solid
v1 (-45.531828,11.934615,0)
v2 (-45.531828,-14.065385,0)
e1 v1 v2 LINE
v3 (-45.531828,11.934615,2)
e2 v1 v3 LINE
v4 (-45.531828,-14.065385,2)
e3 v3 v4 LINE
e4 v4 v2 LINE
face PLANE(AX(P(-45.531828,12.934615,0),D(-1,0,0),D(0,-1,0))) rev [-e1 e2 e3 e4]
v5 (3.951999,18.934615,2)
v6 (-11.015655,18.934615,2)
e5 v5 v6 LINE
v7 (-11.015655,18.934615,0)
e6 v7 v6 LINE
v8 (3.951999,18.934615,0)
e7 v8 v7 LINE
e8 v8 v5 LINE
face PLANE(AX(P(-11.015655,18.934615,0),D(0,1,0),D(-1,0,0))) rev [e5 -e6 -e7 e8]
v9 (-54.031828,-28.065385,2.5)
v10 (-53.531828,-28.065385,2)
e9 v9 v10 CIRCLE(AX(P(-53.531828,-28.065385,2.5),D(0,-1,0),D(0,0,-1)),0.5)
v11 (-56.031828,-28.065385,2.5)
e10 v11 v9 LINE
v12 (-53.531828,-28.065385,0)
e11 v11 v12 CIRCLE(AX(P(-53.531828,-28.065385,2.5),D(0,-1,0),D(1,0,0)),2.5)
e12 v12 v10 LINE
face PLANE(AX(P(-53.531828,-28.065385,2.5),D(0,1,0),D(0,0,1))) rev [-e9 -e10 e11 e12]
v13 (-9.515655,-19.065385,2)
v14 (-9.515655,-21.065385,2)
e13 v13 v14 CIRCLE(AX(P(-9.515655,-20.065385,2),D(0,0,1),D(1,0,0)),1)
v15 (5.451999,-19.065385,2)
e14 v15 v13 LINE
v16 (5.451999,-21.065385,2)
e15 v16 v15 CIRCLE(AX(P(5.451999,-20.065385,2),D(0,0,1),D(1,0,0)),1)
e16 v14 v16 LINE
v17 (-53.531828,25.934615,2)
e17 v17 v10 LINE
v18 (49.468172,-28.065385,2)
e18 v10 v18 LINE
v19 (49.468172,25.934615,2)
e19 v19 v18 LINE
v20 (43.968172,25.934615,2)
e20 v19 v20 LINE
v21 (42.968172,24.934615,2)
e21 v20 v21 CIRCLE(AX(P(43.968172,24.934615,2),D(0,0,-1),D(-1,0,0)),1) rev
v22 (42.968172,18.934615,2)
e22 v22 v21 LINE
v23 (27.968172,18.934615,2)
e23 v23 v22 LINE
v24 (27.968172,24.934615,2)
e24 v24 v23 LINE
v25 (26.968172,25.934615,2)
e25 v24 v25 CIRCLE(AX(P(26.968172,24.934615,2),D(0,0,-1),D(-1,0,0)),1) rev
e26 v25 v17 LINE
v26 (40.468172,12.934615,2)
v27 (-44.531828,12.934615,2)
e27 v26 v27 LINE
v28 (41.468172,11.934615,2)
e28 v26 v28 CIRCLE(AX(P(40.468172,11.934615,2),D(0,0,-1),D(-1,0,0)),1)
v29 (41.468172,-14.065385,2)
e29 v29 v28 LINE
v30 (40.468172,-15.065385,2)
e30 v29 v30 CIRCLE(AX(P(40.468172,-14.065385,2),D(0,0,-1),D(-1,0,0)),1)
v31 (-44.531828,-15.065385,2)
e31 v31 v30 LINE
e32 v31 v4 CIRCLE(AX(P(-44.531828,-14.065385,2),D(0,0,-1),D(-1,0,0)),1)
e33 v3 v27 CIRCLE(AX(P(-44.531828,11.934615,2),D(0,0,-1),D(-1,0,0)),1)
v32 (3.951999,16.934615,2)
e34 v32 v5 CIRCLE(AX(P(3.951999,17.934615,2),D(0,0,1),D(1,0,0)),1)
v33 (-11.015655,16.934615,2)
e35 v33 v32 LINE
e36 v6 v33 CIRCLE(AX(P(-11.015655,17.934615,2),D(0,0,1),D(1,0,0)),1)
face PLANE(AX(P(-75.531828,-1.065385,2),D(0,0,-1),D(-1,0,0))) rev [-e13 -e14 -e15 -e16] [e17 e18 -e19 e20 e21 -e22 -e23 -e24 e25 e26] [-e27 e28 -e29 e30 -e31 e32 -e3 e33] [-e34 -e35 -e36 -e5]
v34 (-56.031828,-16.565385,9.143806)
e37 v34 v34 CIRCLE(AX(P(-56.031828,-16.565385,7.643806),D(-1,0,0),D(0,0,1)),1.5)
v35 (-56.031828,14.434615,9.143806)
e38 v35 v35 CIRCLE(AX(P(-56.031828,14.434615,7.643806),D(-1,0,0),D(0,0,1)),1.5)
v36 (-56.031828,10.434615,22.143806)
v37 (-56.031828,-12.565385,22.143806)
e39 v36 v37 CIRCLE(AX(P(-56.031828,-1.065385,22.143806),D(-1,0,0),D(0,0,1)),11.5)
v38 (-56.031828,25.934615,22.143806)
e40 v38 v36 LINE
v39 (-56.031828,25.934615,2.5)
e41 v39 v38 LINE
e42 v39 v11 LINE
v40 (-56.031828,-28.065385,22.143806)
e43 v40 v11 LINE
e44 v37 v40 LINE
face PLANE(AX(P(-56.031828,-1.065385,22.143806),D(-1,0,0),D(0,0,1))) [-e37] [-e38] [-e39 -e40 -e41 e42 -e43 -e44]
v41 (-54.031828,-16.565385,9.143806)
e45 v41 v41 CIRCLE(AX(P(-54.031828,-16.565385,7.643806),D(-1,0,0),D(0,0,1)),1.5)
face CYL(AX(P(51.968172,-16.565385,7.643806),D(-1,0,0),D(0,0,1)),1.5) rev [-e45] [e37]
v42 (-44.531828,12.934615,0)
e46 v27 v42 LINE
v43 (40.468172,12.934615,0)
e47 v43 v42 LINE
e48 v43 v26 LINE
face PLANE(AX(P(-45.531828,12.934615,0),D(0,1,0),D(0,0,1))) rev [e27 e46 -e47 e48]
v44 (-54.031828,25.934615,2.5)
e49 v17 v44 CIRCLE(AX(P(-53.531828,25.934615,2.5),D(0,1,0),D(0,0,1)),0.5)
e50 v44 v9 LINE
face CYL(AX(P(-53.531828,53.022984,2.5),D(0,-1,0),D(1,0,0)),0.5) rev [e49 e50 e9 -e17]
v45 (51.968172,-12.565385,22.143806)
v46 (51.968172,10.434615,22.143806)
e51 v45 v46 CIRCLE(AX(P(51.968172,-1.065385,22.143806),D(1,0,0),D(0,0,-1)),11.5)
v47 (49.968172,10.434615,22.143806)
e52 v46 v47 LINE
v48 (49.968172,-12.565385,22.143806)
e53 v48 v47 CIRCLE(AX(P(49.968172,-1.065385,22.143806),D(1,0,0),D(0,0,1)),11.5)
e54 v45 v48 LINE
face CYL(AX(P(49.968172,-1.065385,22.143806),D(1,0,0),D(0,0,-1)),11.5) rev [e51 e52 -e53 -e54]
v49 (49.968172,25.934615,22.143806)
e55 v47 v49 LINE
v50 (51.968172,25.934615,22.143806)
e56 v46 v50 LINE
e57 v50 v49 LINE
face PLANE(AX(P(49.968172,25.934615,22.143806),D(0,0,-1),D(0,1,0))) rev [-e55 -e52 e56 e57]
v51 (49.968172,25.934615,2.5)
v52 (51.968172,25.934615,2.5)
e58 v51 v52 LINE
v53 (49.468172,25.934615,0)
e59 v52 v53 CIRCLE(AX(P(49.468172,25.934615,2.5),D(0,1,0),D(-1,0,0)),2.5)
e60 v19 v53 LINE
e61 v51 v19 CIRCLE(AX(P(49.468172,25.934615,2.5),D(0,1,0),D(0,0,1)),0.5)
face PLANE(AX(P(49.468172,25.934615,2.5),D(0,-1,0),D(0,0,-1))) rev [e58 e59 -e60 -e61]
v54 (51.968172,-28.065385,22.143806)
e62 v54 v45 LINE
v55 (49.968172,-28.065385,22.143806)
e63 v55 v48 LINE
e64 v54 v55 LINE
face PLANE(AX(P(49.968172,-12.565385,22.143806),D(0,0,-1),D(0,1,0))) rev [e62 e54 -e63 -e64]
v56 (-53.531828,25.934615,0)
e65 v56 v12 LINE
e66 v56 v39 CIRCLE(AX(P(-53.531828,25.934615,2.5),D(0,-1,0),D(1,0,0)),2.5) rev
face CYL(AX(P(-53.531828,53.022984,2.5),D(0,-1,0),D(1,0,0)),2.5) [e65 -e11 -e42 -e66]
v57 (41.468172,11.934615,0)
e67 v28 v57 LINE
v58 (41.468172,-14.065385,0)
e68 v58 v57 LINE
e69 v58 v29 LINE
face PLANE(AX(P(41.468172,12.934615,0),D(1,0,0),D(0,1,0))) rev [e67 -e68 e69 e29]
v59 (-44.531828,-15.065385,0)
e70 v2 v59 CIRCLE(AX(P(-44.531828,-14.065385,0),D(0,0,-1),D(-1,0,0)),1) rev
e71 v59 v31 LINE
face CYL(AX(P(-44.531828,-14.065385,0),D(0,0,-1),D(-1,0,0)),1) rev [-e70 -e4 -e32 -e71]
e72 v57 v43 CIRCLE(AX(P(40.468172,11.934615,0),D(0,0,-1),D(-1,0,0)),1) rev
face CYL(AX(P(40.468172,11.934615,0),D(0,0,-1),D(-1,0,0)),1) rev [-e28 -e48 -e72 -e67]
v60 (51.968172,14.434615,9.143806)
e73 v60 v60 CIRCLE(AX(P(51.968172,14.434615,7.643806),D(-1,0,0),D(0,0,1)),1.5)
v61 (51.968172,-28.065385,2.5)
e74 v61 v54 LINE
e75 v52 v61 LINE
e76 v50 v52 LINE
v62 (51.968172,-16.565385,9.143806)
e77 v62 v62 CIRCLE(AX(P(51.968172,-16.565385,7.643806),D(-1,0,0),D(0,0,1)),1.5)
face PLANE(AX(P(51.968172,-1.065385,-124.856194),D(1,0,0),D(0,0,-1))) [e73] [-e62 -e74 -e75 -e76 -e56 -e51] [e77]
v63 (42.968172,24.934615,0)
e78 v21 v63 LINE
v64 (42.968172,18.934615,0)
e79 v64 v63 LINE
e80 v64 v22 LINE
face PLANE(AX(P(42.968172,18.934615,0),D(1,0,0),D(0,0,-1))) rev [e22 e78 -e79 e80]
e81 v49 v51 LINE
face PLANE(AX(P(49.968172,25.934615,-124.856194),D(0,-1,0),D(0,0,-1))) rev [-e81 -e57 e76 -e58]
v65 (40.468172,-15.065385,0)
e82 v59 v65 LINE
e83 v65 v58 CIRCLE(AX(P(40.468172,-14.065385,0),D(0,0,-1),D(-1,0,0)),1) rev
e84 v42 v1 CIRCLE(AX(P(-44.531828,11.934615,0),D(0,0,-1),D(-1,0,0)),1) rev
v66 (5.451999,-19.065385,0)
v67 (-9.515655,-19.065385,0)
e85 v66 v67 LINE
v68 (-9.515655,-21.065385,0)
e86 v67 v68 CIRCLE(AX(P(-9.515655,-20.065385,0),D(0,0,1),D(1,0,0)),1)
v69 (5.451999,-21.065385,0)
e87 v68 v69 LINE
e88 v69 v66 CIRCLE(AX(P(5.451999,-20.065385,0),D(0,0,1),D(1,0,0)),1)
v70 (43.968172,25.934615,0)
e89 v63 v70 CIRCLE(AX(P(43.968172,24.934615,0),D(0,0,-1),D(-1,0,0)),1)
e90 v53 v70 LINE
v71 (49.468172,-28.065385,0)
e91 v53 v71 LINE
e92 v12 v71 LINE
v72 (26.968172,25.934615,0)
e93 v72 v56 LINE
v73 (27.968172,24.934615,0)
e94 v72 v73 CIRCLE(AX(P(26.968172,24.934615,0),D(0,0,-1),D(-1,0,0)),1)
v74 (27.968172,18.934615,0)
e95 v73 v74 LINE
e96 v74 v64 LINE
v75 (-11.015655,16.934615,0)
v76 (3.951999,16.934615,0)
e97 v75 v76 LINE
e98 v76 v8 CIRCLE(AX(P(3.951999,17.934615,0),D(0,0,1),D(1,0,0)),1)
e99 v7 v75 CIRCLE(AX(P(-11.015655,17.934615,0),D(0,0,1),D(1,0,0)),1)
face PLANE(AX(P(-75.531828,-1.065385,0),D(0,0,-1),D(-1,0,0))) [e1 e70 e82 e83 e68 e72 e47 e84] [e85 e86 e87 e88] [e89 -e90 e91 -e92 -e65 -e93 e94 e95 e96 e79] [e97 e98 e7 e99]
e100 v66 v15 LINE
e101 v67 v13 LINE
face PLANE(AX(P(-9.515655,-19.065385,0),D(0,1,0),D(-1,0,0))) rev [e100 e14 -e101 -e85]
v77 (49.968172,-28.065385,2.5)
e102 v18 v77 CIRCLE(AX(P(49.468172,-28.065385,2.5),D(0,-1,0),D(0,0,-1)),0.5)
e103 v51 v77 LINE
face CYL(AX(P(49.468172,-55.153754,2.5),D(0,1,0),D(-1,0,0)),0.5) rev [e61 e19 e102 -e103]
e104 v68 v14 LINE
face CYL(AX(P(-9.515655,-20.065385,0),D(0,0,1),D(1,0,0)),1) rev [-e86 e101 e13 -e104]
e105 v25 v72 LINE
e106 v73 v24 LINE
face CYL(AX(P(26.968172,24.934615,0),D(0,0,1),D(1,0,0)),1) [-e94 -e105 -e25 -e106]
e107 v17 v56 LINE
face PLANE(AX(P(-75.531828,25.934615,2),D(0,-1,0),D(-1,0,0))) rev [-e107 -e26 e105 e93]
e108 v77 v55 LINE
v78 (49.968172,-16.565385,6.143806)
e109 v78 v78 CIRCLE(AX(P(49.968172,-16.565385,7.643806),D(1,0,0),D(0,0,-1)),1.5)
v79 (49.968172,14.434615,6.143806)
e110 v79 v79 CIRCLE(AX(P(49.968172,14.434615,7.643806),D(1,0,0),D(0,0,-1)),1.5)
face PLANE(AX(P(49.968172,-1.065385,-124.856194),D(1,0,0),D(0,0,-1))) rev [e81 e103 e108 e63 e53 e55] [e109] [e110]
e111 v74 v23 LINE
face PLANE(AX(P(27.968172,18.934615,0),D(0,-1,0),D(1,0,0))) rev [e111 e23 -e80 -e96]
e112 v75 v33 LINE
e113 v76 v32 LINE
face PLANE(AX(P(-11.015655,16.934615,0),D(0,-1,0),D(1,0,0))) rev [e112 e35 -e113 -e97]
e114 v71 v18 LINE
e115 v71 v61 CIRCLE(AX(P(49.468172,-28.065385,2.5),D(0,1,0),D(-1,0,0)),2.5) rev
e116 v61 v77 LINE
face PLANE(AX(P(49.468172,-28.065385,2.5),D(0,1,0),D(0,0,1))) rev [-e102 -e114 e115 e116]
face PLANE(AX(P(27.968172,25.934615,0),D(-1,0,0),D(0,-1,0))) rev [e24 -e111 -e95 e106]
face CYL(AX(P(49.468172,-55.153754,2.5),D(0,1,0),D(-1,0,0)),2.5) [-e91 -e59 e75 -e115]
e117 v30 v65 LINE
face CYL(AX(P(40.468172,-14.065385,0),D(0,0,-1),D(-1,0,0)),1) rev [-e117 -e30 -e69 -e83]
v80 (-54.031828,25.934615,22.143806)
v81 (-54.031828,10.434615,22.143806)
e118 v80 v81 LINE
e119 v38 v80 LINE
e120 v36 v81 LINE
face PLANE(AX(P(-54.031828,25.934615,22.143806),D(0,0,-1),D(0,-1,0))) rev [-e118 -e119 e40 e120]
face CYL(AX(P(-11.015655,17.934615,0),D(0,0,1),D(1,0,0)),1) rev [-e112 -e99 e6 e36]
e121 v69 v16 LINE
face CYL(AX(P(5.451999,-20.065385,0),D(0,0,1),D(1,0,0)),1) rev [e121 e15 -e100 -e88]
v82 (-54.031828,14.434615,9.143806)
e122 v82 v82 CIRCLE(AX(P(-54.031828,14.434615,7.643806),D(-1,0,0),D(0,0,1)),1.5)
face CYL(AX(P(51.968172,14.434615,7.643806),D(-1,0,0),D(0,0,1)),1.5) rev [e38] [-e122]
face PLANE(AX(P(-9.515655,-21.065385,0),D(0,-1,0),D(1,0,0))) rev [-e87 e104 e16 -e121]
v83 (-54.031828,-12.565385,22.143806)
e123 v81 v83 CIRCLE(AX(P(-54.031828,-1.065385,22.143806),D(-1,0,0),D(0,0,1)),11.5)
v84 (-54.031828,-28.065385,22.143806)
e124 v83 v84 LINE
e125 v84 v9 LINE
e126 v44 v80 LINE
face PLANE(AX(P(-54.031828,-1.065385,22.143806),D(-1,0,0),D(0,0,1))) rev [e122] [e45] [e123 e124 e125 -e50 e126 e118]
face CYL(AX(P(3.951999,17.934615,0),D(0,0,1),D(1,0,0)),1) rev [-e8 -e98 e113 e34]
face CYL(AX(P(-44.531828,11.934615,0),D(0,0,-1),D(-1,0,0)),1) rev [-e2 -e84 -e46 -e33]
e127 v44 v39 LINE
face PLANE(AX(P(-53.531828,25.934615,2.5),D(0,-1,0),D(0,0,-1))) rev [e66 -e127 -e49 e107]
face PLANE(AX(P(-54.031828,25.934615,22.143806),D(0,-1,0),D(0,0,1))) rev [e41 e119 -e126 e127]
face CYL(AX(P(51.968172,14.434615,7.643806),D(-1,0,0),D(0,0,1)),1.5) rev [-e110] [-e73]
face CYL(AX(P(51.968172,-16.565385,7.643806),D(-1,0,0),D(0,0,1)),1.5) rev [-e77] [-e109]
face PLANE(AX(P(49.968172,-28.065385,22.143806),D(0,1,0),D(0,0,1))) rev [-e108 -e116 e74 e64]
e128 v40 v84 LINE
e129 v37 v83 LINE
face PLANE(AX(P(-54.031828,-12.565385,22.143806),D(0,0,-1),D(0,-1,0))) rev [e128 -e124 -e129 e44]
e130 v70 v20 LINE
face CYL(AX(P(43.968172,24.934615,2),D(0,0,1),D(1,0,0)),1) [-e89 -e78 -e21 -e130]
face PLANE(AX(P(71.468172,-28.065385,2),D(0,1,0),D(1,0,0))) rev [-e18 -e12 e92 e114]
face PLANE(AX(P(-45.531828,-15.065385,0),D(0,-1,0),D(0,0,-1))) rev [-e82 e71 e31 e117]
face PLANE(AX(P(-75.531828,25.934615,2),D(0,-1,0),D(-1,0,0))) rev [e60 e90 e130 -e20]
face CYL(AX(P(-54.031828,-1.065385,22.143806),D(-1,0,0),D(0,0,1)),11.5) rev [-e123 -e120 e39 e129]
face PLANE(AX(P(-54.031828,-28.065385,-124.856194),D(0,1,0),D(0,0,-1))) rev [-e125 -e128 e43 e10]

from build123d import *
from build123d.topology import SkipClean

# Parameters (mm, degrees)
DODANIE_WYCI_GNI_CIE1_DEPTH = 2
SZKIC_START                 = -28.065385
SZKIC_ZGI_CIA1_DEPTH        = 54
SZKIC_ZGI_CIA1_2_DEPTH      = 15.5
SZKIC_START_2               = 10.434615
SZKIC_ZGI_CIA1_3_DEPTH      = 15.5
SZKIC_START_3               = -56.031828
SZKIC_ZGI_CIA1_4_DEPTH      = 2.423909
SZKIC_START_4               = -12.565385
SZKIC_ZGI_CIA1_5_DEPTH      = 23
SZKIC_ZGI_CIA1_6_DEPTH      = 23
SZKIC_ZGI_CIA2_DEPTH        = 54
SZKIC_ZGI_CIA2_2_DEPTH      = 54
SZKIC_START_5               = 49.968172
SZKIC_ZGI_CIA2_3_DEPTH      = 2
SZKIC9_W                    = 87
SZKIC9_H                    = 28
SZKIC9_W_2                  = 15
SZKIC9_H_2                  = 7
WYTNIJ_WYCI_GNI_CIE1_DEPTH  = 66.825561
SZKIC10_R                   = 1.5
WYTNIJ_WYCI_GNI_CIE2_DEPTH  = 114.762973
ZAOKR_GLENIE2_R             = 1
ZAOKR_GLENIE3_R             = 1


with BuildPart() as part:
    # Szkic1 → Dodanie-wyciągnięcie1 (new body)
    with BuildSketch(Plane.XY):
        with BuildLine():
            Line((-75.531828, 25.934615), (71.468172, 25.934615))
            Line((71.468172, 25.934615), (71.468172, 10.434615))
            ThreePointArc((71.468172, 10.434615), (59.968172, -1.065385), (71.468172, -12.565385))
            Line((71.468172, -12.565385), (71.468172, -28.065385))
            Line((71.468172, -28.065385), (-75.531828, -28.065385))
            Line((-75.531828, -28.065385), (-75.531828, -12.565385))
            ThreePointArc((-75.531828, -12.565385), (-64.031828, -1.065385), (-75.531828, 10.434615))
            Line((-75.531828, 10.434615), (-75.531828, 25.934615))
        make_face()
    extrude(amount=DODANIE_WYCI_GNI_CIE1_DEPTH)

    # Szkic zgięcia1: read off the stored shape, not the designer's step
    # Szkic zgięcia1 outline → Szkic zgięcia1 (cut)
    with BuildSketch(Plane(origin=(0, 0, 0), x_dir=(1, 0, 0), z_dir=(0, 1, 0)).offset(SZKIC_START)):
        with BuildLine():
            Line((-75.531828, -2), (-55.981318, -2))
            ThreePointArc((-55.981318, -2), (-55.112967, -0.563508), (-53.531828, 0))
            Line((-53.531828, 0), (-75.531828, 0))
            Line((-75.531828, 0), (-75.531828, -2))
        make_face()
    extrude(amount=SZKIC_ZGI_CIA1_DEPTH, mode=Mode.SUBTRACT)

    # Szkic zgi_cia1 2 outline → Szkic zgi_cia1 2 (add)
    with BuildSketch(Plane(origin=(0, 0, 0), x_dir=(1, 0, 0), z_dir=(0, 1, 0)).offset(SZKIC_START)):
        with BuildLine():
            ThreePointArc((-55.981318, -2), (-56.019168, -2.248728), (-56.031828, -2.5))
            Line((-56.031828, -2.5), (-56.031828, -22.143806))
            Line((-56.031828, -22.143806), (-54.031828, -22.143806))
            Line((-54.031828, -22.143806), (-54.031828, -2.5))
            ThreePointArc((-54.031828, -2.5), (-53.885381, -2.146447), (-53.531828, -2))
            Line((-53.531828, -2), (-55.981318, -2))
        make_face()
    extrude(amount=SZKIC_ZGI_CIA1_2_DEPTH)

    # Szkic zgi_cia1 3 outline → Szkic zgi_cia1 3 (add)
    with BuildSketch(Plane(origin=(0, 0, 0), x_dir=(1, 0, 0), z_dir=(0, 1, 0)).offset(SZKIC_START_2)):
        with BuildLine():
            ThreePointArc((-55.981318, -2), (-56.019168, -2.248728), (-56.031828, -2.5))
            Line((-56.031828, -2.5), (-56.031828, -22.143806))
            Line((-56.031828, -22.143806), (-54.031828, -22.143806))
            Line((-54.031828, -22.143806), (-54.031828, -2.5))
            ThreePointArc((-54.031828, -2.5), (-53.885381, -2.146447), (-53.531828, -2))
            Line((-53.531828, -2), (-55.981318, -2))
        make_face()
    extrude(amount=SZKIC_ZGI_CIA1_3_DEPTH)

    # Szkic zgi_cia1 4 outline → Szkic zgi_cia1 4 (add)
    with BuildSketch(Plane.YZ.offset(SZKIC_START_3)):
        with BuildLine():
            Line((10.434615, 2), (10.434615, 22.143806))
            ThreePointArc((10.434615, 22.143806), (-1.065385, 10.643806), (-12.565385, 22.143806))
            Line((-12.565385, 22.143806), (-12.565385, 2))
            Line((-12.565385, 2), (10.434615, 2))
        make_face()
    extrude(amount=SZKIC_ZGI_CIA1_4_DEPTH)

    # Szkic zgi_cia1 5 outline → Szkic zgi_cia1 5 (cut)
    with SkipClean():  # the faces are left unmerged after this step: merging them gives an invalid solid
        with BuildSketch(Plane(origin=(0, 0, 0), x_dir=(1, 0, 0), z_dir=(0, 1, 0)).offset(SZKIC_START_4)):
            with BuildLine():
                ThreePointArc((-53.607919, -2.005824), (-53.911331, -2.174459), (-54.031828, -2.5))
                Line((-54.031828, -2.5), (-54.031828, -24))
                Line((-54.031828, -24), (-53.607919, -24))
                Line((-53.607919, -24), (-53.607919, -2.005824))
            make_face()
            with BuildLine():
                Line((-58, -24), (-56.031828, -24))
                Line((-56.031828, -24), (-56.031828, -2.5))
                ThreePointArc((-56.031828, -2.5), (-56.019168, -2.248728), (-55.981318, -2))
                Line((-55.981318, -2), (-58, -2))
                Line((-58, -2), (-58, -24))
            make_face()
        extrude(amount=SZKIC_ZGI_CIA1_5_DEPTH, mode=Mode.SUBTRACT)

    # Szkic zgi_cia1 6 outline → Szkic zgi_cia1 6 (add)
    with SkipClean():  # the faces are left unmerged after this step: merging them gives an invalid solid
        with BuildSketch(Plane(origin=(0, 0, 0), x_dir=(1, 0, 0), z_dir=(0, 1, 0)).offset(SZKIC_START_4)):
            with BuildLine():
                Line((-53.607919, -2), (-53.607919, -2.005824))
                ThreePointArc((-53.607919, -2.005824), (-53.569985, -2.001458), (-53.531828, -2))
                Line((-53.531828, -2), (-53.607919, -2))
            make_face()
        extrude(amount=SZKIC_ZGI_CIA1_6_DEPTH)

    # Szkic zgięcia2: read off the stored shape, not the designer's step
    # Szkic zgięcia2 outline → Szkic zgięcia2 (cut)
    with SkipClean():  # the faces are left unmerged after this step: merging them gives an invalid solid
        with BuildSketch(Plane(origin=(0, 0, 0), x_dir=(1, 0, 0), z_dir=(0, 1, 0)).offset(SZKIC_START)):
            with BuildLine():
                ThreePointArc((49.468172, 0), (51.049311, -0.563508), (51.917662, -2))
                Line((51.917662, -2), (71.468172, -2))
                Line((71.468172, -2), (71.468172, 0))
                Line((71.468172, 0), (49.468172, 0))
            make_face()
        extrude(amount=SZKIC_ZGI_CIA2_DEPTH, mode=Mode.SUBTRACT)

    # Szkic zgi_cia2 2 outline → Szkic zgi_cia2 2 (add)
    with SkipClean():  # the faces are left unmerged after this step: merging them gives an invalid solid
        with BuildSketch(Plane(origin=(0, 0, 0), x_dir=(1, 0, 0), z_dir=(0, 1, 0)).offset(SZKIC_START)):
            with BuildLine():
                Line((49.968172, -22.143806), (51.968172, -22.143806))
                Line((51.968172, -22.143806), (51.968172, -2.5))
                ThreePointArc((51.968172, -2.5), (51.955512, -2.248728), (51.917662, -2))
                Line((51.917662, -2), (49.468172, -2))
                ThreePointArc((49.468172, -2), (49.821725, -2.146447), (49.968172, -2.5))
                Line((49.968172, -2.5), (49.968172, -22.143806))
            make_face()
        extrude(amount=SZKIC_ZGI_CIA2_2_DEPTH)

    # Szkic zgi_cia2 3 outline → Szkic zgi_cia2 3 (cut)
    with SkipClean():  # the faces are left unmerged after this step: merging them gives an invalid solid
        with BuildSketch(Plane.YZ.offset(SZKIC_START_5)):
            with BuildLine():
                Line((10.434615, 22.143806), (-12.565385, 22.143806))
                ThreePointArc((-12.565385, 22.143806), (-1.065385, 10.643806), (10.434615, 22.143806))
            make_face()
        extrude(amount=SZKIC_ZGI_CIA2_3_DEPTH, mode=Mode.SUBTRACT)

    # Szkic9 → Wytnij-wyciągnięcie1 (cut, through all)
    with SkipClean():  # the faces are left unmerged after this step: merging them gives an invalid solid
        with BuildSketch(Plane.XY.offset(2)):
            with Locations((-2.031828, -1.065385)):
                Rectangle(SZKIC9_W, SZKIC9_H)
            with Locations((35.468172, 22.434615)):
                Rectangle(SZKIC9_W_2, SZKIC9_H_2)
            with BuildLine():
                Line((-11.015655, 18.934615), (3.951999, 18.934615))
                ThreePointArc((3.951999, 18.934615), (4.951999, 17.934615), (3.951999, 16.934615))
                Line((3.951999, 16.934615), (-11.015655, 16.934615))
                ThreePointArc((-11.015655, 16.934615), (-12.015655, 17.934615), (-11.015655, 18.934615))
            make_face()
            with BuildLine():
                Line((-9.515655, -19.065385), (5.451999, -19.065385))
                ThreePointArc((5.451999, -19.065385), (6.451999, -20.065385), (5.451999, -21.065385))
                Line((5.451999, -21.065385), (-9.515655, -21.065385))
                ThreePointArc((-9.515655, -21.065385), (-10.515655, -20.065385), (-9.515655, -19.065385))
            make_face()
        extrude(amount=-WYTNIJ_WYCI_GNI_CIE1_DEPTH, mode=Mode.SUBTRACT)

    # Szkic10 → Wytnij-wyciągnięcie2 (cut, through all)
    with SkipClean():  # the faces are left unmerged after this step: merging them gives an invalid solid
        with BuildSketch(Plane.ZY.offset(56.031828)):
            with Locations((7.643806, 14.434615)):
                Circle(SZKIC10_R)
            with Locations((7.643806, -16.565385)):
                Circle(SZKIC10_R)
        extrude(amount=-WYTNIJ_WYCI_GNI_CIE2_DEPTH, mode=Mode.SUBTRACT)

    # Zaokrąglenie2
    zaokr_glenie2_edges = [part.edges().sort_by_distance(p)[0] for p in [
        (27.968172, 25.934615, 1),
        (42.968172, 25.934615, 1),
    ]]
    fillet(zaokr_glenie2_edges, radius=ZAOKR_GLENIE2_R)

    # Zaokrąglenie3
    zaokr_glenie3_edges = [part.edges().sort_by_distance(p)[0] for p in [
        (-45.531828, -15.065385, 1),
        (-45.531828, 12.934615, 1),
        (41.468172, 12.934615, 1),
        (41.468172, -15.065385, 1),
    ]]
    fillet(zaokr_glenie3_edges, radius=ZAOKR_GLENIE3_R)


solid = part.part
